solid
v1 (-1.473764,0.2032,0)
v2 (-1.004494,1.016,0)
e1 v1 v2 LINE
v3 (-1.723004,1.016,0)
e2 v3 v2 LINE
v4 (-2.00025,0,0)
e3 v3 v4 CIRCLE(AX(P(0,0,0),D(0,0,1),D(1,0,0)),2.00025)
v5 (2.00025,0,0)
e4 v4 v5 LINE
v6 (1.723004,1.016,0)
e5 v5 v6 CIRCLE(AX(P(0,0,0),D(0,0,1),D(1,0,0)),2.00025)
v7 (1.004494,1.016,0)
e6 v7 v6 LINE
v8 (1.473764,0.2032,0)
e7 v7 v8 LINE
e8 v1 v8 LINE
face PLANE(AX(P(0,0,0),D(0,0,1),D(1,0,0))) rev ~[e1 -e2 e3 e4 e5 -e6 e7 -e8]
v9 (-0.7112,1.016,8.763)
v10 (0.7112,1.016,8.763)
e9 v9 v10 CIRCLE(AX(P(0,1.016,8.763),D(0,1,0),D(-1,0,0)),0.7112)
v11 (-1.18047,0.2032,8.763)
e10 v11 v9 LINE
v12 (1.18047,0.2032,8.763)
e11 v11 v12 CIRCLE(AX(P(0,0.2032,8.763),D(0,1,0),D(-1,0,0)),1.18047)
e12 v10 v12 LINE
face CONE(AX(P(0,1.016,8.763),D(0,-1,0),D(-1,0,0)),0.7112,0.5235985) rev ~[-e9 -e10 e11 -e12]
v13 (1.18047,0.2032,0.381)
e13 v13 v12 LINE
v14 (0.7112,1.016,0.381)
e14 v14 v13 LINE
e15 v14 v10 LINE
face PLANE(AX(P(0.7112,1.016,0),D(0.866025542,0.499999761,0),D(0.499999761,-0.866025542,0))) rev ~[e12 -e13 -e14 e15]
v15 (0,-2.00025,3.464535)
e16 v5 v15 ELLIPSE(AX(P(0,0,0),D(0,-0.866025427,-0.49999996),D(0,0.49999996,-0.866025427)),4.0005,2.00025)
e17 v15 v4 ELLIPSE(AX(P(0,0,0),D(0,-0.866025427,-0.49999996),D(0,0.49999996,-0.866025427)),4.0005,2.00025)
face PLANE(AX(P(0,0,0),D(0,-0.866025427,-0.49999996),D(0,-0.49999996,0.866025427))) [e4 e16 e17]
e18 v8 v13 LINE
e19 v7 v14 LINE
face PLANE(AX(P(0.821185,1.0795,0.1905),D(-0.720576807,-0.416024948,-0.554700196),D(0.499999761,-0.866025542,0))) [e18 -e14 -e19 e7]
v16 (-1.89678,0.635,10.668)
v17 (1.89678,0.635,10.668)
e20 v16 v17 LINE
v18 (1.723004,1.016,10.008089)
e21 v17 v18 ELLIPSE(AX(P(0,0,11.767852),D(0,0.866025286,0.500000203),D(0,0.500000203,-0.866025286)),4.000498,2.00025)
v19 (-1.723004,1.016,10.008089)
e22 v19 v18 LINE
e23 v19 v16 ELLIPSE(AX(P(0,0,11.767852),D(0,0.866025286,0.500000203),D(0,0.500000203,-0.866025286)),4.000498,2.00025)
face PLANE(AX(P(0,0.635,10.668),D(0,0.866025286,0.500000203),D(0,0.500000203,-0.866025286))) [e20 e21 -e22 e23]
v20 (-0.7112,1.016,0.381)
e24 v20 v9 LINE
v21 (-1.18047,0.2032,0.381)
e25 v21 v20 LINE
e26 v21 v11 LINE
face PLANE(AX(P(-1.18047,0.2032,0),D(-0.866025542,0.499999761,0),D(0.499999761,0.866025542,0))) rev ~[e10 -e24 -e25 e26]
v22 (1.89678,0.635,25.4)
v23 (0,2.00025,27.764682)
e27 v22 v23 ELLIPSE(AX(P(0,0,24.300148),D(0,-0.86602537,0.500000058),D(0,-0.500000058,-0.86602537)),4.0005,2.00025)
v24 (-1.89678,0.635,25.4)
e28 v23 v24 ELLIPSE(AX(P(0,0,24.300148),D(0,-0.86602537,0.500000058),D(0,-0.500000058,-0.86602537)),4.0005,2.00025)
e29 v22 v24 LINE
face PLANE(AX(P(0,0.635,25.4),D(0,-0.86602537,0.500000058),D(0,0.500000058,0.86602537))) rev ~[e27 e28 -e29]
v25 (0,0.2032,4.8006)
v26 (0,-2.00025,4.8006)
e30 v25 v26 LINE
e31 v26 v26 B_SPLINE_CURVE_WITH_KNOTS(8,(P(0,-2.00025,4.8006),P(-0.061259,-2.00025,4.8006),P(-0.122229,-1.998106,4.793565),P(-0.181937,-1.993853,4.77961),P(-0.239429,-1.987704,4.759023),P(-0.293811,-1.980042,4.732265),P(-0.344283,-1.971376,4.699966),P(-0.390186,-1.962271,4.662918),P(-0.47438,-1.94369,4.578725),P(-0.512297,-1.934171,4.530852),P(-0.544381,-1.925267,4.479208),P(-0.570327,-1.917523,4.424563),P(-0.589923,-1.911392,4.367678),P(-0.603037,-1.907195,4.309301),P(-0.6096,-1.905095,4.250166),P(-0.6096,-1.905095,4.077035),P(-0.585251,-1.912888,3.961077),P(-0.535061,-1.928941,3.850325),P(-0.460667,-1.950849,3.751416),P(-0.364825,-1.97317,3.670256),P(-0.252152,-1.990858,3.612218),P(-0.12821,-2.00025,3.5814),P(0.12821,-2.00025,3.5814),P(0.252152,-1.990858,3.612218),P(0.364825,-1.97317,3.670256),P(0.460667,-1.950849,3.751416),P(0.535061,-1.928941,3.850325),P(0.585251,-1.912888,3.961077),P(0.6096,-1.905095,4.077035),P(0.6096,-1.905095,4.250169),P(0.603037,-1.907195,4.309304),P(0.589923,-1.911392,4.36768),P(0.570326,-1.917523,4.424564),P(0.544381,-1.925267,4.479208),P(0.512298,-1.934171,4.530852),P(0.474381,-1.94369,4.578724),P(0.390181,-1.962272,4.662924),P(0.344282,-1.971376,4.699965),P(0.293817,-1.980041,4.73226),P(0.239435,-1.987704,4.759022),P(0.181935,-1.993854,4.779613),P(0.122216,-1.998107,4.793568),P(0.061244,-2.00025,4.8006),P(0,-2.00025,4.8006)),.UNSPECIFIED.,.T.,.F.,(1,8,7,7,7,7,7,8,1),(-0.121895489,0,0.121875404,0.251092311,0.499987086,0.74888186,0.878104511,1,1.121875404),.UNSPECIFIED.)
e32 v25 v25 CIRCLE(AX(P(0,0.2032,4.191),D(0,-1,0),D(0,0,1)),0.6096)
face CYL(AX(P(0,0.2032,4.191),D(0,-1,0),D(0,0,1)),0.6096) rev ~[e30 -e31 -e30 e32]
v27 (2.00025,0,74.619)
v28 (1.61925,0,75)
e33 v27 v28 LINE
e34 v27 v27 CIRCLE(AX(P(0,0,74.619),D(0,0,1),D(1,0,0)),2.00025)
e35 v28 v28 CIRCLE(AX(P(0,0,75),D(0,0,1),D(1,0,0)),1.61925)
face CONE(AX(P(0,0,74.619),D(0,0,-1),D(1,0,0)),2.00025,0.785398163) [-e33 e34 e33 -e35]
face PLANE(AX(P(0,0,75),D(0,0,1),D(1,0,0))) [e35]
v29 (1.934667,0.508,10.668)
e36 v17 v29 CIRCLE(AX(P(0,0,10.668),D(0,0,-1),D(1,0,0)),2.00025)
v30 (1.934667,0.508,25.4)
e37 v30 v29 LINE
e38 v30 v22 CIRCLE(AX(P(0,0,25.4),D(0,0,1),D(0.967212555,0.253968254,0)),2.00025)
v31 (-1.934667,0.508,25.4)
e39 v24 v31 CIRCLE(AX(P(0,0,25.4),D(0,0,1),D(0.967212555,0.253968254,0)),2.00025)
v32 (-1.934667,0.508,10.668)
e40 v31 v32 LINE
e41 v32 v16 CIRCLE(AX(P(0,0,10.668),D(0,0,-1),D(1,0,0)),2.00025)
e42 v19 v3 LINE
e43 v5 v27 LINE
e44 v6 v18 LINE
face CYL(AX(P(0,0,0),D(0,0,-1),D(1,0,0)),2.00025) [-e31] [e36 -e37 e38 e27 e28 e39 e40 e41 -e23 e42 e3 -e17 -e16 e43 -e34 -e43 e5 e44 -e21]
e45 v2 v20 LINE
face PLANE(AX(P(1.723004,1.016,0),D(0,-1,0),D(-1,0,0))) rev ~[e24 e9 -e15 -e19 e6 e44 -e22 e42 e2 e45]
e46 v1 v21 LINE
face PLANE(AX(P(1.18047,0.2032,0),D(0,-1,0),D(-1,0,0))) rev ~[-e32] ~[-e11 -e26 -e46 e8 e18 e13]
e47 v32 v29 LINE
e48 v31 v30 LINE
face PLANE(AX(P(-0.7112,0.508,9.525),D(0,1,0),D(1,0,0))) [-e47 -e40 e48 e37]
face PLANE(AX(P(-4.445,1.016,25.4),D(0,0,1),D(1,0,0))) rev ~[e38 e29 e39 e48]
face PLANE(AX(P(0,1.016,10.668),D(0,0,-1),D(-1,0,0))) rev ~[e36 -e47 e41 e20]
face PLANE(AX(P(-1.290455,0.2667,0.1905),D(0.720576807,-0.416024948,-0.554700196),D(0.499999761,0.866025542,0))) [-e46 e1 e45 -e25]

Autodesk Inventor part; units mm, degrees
ref_plane "YZ Plane" through (0, 0, 0) normal (1, 0, 0) x (0, 1, 0)
ref_plane "XZ Plane" through (0, 0, 0) normal (0, 1, 0) x (-1, 0, 0)
ref_plane "XY Plane" through (0, 0, 0) normal (0, 0, 1) x (1, 0, 0)
sketch "Sketch1" plane through (0, 0, 0) normal (0, 0, 1) x (1, 0, 0)
  circle A0 centre (0, 0) radius 2.00025
  dimension "d0" = 4.0005
extrude "Extrusion1" add sketch "Sketch1" along normal blind 75
sketch "Sketch2" plane through (0, 0, 0) normal (0, 0, 1) x (1, 0, 0)
  circle A0 centre (0, 0) radius 2.00025
  line L0 (1.353027, 1.4732) -> (-1.353027, 1.4732)
  line L1 (0, 2.80035) -> (0, -2.80035)
  line L2 (-2.80035, 0) -> (2.80035, 0)
  line L3 (1.723004, 1.016) -> (-1.723004, 1.016)
  line L4 (0.7112, 1.016) -> (1.18047, 0.2032)
  line L5 (1.18047, 0.2032) -> (-1.18047, 0.2032)
  line L6 (-1.18047, 0.2032) -> (-0.7112, 1.016)
  line L7 (0, 0) -> (0, 2.00025)
  dimension "d6" = 1.016
  dimension "d9" = 60
  dimension "d10" = 1.4224
  dimension "d11" = 0.8128
  dimension "d40" = 0.4572
extrude "Extrusion3" cut sketch "Sketch2" along normal blind 9.525 contours L3 L1 L0 A0 | L1 L3 A0 L0
extrude "Extrusion4" cut sketch "Sketch2" along normal blind 8.763 contours L4 L5 L1 L3 | L5 L6 L3 L1
sketch "Sketch3" plane through (-1.18047, 0.2032, 9.525) normal (0, 1, 0) x (1, 0, 0)
  line L0 (0, 9.525) -> (2.360941, 9.525)
  line L1 (1.18047, 24.525) -> (1.18047, -80.475)
  point P0 (1.18047, 9.525)
  point P1 (1.18047, 5.334)
  dimension "d14" = 4.191
hole "Hole1" at (0, 0.2032, 4.191) direction (0, -1, 0) diameter 1.2192 end through all thread size "M1.6x0.35" class "6H" standard "ANSI Metric M Profile"
sketch "Sketch4" plane through (0, 0, 0) normal (1, 0, 0) x (0, 1, 0)
  line L0 (0, 120) -> (0, -20)
  line L1 (-2.00025, 0) -> (-2.00025, 75)
  line L2 (0, 0) -> (-2.00025, 3.464535)
  line L3 (-2.00025, 3.464535) -> (-2.00025, 0)
  line L4 (-2.00025, 0) -> (0, 0)
  dimension "d23" = 30
extrude "Extrusion5" cut sketch "Sketch4" along normal mid plane 12.7
chamfer "Chamfer1" distance 0.254 distance2 0.381 1 edges at (-0.9458, 0.6096, 0) measured on face at (-1.2049, 0.7451, 0)
chamfer "Chamfer2" distance 0.254 distance2 0.381 1 edges at (0.9458, 0.6096, 0) measured on face at (1.2049, 0.7451, 0)
chamfer "Chamfer3" distance 0.381 angle 45 1 edges at (-2.0003, 0, 75)
extrude "Extrusion7" cut sketch "Sketch2" along normal blind 25.4 contours L3 L1 L0 A0 | L0 L1 A0 | L1 L0 A0 | L1 L3 A0 L0
sketch "Sketch6" plane through (-0.7112, 1.016, 9.525) normal (0, 1, 0) x (1, 0, 0)
  line L0 (-1.011804, -15.875) -> (2.434204, -15.875)
  line L1 (0.7112, 24.525) -> (0.7112, -80.475)
  line L2 (6.9342, 9.525) -> (-5.5118, 9.525)
  line L3 (5.1562, -1.143) -> (-3.7338, -1.143)
  line L4 (-3.7338, -1.143) -> (-3.7338, -15.875)
  line L5 (-3.7338, -15.875) -> (5.1562, -15.875)
  line L6 (5.1562, -15.875) -> (5.1562, -1.143)
  line L7 (5.1562, -1.143) -> (-3.7338, -15.875) construction
  line L8 (-3.7338, -1.143) -> (5.1562, -15.875) construction
  point P0 (0.7112, 9.525)
  point P1 (0.7112, -8.509)
  dimension "d43" = 0
  dimension "d45" = 8.89
  dimension "d68" = 10.668
  dimension "d69" = 14.732
extrude "Extrusion8" cut sketch "Sketch6" against normal blind 0.508
sketch "Sketch11" plane through (0, 0, 0) normal (1, 0, 0) x (0, 1, 0)
  line L0 (0.508, 10.668) -> (0.508, 25.4)
  line L1 (2.00025, 25.4) -> (2.00025, 74.619)
  line L2 (0.635, 25.4) -> (2.00025, 27.764682)
  line L3 (0.508, 10.668) -> (1.016, 10.668)
  line L4 (-0.40005, 0) -> (2.4003, 0)
  line L5 (0.635, 10.668) -> (1.016, 10.008089)
  line L6 (1.016, 10.008089) -> (1.016, 10.668)
  line L7 (0.635, 10.668) -> (1.016, 10.668)
  line L8 (2.00025, 27.764682) -> (2.00025, 25.4)
  line L9 (2.00025, 25.4) -> (0.508, 25.4)
  line L10 (0.635, 25.4) -> (2.00025, 25.4)
  point P0 (0, 0)
  dimension "d56" = 0.127
  dimension "d57" = 10.668
  dimension "d58" = 0.127
  dimension "d59" = 30
  dimension "d64" = 30
extrude "Extrusion10" cut sketch "Sketch11" along normal mid plane 6.35
sketch "Sketch12" plane through (-1.473764, 0.2032, 0) normal (0, 1, 0) x (1, 0, 0)
  circle A0 centre (1.473764, -4.191) radius 0.6096
  circle A1 centre (1.473764, -4.191) radius 0.8
  circle A2 centre (1.473764, -4.191) radius 0.7
  point P0 (1.473764, 0)
  dimension "d65" = 1.6
  dimension "d66" = 1.4
sketch "Sketch14" plane through (0, 0, 8.763) normal (0, 0, -1) x (-1, 0, 0)
  line L0 (0.7112, 1.016) -> (1.18047, 0.2032)
  line L1 (-1.473764, 0.2032) -> (1.473764, 0.2032)
  line L2 (0.7112, 1.016) -> (0.7112, 0.2032)
  line L3 (1.18047, 0.2032) -> (-1.18047, 0.2032)
  line L4 (0.7112, 0.2032) -> (1.18047, 0.2032)
  line L5 (0, -2.80035) -> (0, 2.80035)
  line L6 (0, 0.2032) -> (0, 1.016)
  line L7 (0.7112, 1.016) -> (0, 1.016)
  line L8 (0, 1.016) -> (0, 0.2032)
  line L9 (0, 0.2032) -> (0.7112, 0.2032)
  line L10 (0.7112, 0.2032) -> (0.7112, 1.016)
  point P0 (0, 0)
revolve "Revolution1" cut sketch "Sketch14" angle 360 about axis through (0, 0, 8.763) along (0, 1, 0)
properties part number "J008040 NEUROPIXELS GEN 2 DOVE TAIL PROBE HOLDER Rev -" material "ALUMINUM, 7075-T651"
